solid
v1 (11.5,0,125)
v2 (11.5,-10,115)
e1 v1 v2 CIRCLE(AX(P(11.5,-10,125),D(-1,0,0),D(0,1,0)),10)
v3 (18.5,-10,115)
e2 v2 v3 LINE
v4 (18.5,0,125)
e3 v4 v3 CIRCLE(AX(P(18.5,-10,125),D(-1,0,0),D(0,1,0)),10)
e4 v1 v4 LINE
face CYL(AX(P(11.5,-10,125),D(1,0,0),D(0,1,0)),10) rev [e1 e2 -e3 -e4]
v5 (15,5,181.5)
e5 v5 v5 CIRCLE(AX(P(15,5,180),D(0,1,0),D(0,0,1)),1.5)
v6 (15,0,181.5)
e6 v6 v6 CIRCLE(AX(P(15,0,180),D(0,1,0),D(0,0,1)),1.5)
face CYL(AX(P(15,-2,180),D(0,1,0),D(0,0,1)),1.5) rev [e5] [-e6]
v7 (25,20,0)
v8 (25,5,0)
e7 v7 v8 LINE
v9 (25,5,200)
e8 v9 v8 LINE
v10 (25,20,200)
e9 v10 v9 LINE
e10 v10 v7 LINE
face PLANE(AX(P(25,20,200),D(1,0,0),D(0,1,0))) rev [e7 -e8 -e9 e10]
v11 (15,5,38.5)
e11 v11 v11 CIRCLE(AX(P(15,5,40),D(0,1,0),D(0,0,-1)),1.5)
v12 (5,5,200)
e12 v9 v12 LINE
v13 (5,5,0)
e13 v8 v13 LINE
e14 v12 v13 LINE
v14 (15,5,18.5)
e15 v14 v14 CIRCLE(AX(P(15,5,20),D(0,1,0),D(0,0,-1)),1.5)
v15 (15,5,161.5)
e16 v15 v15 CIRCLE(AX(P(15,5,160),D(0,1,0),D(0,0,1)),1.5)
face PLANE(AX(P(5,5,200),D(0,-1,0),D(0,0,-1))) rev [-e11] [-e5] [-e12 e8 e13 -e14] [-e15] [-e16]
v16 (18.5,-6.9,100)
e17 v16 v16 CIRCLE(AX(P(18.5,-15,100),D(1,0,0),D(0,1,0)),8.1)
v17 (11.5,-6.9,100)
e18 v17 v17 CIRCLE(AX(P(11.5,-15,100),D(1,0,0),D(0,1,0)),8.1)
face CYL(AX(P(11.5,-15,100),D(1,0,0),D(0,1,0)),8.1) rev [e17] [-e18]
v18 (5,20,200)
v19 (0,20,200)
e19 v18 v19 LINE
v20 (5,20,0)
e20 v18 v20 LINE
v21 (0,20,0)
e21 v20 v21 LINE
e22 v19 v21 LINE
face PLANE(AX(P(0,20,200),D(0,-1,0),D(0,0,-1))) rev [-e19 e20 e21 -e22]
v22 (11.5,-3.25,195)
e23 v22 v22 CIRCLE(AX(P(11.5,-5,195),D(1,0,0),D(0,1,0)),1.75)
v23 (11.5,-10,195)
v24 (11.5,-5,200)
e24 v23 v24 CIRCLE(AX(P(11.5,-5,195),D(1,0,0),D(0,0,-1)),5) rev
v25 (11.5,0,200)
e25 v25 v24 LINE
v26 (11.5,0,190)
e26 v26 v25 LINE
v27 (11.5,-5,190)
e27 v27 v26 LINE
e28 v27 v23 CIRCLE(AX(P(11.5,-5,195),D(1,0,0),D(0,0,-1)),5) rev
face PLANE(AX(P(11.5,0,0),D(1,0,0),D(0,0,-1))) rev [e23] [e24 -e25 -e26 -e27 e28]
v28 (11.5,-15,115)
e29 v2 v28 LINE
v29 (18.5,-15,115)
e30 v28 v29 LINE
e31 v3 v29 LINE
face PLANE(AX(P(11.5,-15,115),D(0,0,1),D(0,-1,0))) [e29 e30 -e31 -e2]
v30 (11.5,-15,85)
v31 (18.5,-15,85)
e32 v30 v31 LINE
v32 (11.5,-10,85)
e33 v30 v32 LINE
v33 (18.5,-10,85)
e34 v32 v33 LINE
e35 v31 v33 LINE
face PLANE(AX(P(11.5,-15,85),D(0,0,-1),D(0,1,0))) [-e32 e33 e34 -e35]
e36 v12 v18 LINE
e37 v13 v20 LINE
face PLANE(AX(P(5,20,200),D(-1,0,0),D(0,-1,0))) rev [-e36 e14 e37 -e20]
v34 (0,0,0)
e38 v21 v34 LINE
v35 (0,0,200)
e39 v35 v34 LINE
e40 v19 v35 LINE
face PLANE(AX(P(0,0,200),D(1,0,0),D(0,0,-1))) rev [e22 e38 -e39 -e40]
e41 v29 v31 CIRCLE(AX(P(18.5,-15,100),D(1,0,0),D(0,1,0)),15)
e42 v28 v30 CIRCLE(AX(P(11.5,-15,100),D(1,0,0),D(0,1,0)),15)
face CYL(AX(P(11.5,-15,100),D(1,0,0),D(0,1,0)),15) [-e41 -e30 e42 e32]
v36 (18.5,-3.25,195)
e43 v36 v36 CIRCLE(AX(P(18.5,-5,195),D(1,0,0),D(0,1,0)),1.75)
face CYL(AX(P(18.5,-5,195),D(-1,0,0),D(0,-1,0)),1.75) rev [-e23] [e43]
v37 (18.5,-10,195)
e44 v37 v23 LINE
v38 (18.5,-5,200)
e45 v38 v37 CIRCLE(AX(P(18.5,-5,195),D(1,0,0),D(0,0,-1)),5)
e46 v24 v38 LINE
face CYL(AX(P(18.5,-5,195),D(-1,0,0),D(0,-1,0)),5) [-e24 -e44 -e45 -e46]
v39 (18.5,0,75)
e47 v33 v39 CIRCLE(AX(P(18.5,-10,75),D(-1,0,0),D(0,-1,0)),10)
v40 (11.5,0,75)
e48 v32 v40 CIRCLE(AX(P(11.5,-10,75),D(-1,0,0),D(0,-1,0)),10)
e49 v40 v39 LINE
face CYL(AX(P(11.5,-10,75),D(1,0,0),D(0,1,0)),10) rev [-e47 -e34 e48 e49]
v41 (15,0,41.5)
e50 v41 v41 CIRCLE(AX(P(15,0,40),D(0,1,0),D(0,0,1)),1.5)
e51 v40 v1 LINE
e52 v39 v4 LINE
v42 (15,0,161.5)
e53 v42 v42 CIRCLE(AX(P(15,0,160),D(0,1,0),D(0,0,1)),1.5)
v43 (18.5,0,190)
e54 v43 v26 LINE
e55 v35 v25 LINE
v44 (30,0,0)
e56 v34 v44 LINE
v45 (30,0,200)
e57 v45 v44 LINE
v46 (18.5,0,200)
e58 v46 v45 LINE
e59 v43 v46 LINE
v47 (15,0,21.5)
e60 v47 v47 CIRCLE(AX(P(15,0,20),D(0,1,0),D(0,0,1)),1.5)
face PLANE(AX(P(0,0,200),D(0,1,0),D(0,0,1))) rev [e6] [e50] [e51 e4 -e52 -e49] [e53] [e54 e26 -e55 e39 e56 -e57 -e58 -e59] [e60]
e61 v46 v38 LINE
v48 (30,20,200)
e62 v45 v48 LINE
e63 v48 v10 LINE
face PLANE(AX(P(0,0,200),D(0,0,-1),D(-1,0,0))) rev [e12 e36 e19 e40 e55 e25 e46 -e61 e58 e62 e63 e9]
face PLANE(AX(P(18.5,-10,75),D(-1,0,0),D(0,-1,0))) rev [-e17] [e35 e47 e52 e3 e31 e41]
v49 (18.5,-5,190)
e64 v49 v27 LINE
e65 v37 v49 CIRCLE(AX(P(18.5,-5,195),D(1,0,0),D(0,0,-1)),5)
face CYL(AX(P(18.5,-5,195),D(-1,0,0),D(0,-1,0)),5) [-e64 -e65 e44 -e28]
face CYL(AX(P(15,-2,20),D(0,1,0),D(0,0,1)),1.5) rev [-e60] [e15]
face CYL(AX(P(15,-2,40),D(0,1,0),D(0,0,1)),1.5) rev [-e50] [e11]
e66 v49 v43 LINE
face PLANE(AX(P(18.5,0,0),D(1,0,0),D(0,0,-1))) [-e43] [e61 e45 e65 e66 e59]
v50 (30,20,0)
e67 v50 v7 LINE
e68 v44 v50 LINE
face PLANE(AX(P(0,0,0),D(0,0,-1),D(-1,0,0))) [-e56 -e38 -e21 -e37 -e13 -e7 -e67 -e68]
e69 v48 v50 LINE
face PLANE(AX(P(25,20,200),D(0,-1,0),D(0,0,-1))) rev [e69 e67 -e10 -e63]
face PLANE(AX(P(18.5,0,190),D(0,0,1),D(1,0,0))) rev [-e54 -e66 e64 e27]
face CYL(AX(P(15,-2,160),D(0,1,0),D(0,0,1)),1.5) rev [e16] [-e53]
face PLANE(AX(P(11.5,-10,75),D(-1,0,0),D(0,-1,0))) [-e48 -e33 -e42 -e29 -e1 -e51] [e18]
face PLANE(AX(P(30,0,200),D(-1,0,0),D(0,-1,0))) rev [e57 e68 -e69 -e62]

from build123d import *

# Parameters (mm, degrees)
BOSS_EXTRUDE1_DEPTH = 200
BOSS_EXTRUDE2_START = -11.5
SKETCH2_R           = 8.1
BOSS_EXTRUDE2_DEPTH = 7
BOSS_EXTRUDE3_START = -18.5
SKETCH3_W           = 10
SKETCH3_H           = 10
SKETCH3_R           = 1.75
BOSS_EXTRUDE3_DEPTH = 7
FILLET1_R           = 5
SKETCH5_R           = 1.5
CUT_EXTRUDE1_DEPTH  = 7


with BuildPart() as part:
    # Sketch1 → Boss-Extrude1 (new body)
    with BuildSketch(Plane.XY):
        Polygon((25, 20), (30, 20), (30, 0), (0, 0), (0, 20), (5, 20), (5, 5), (25, 5), align=None)
    extrude(amount=BOSS_EXTRUDE1_DEPTH)

    # Sketch2 → Boss-Extrude2 (add)
    with BuildSketch(Plane(origin=(30, 0, 0), x_dir=(0, 0, -1), z_dir=(1, 0, 0)).offset(BOSS_EXTRUDE2_START)):
        with BuildLine():
            Line((-115, -15), (-115, -10))
            ThreePointArc((-115, -10), (-117.928932188, -2.928932188), (-125, 0))
            Line((-125, 0), (-75, 0))
            ThreePointArc((-75, 0), (-82.071067812, -2.928932188), (-85, -10))
            Line((-85, -10), (-85, -15))
            ThreePointArc((-85, -15), (-100, -30), (-115, -15))
        make_face()
        with Locations(Location((-100, -15, 0), (0, 0, 90))):
            Circle(SKETCH2_R, mode=Mode.SUBTRACT)
    extrude(amount=-BOSS_EXTRUDE2_DEPTH)

    # Sketch3 → Boss-Extrude3 (add)
    with BuildSketch(Plane(origin=(30, 0, 0), x_dir=(0, 0, -1), z_dir=(1, 0, 0)).offset(BOSS_EXTRUDE3_START)):
        with Locations((-195, -5)):
            Rectangle(SKETCH3_W, SKETCH3_H)
        with Locations(Location((-195, -5, 0), (0, 0, 90))):
            Circle(SKETCH3_R, mode=Mode.SUBTRACT)
    extrude(amount=BOSS_EXTRUDE3_DEPTH)

    # Fillet1
    fillet1_edges = [part.edges().sort_by_distance(p)[0] for p in [
        (15, -10, 190),
        (15, -10, 200),
    ]]
    fillet(fillet1_edges, radius=FILLET1_R - 0.0001)  # a hair under: the kernel refuses the full size

    # Sketch5 → Cut-Extrude1 (cut)
    with BuildSketch(Plane(origin=(0, 5, 0), x_dir=(1, 0, 0), z_dir=(0, 1, 0))):
        with Locations(Location((15, -180, 0), (0, 0, 270))):
            Circle(SKETCH5_R)
        with Locations(Location((15, -160, 0), (0, 0, 270))):
            Circle(SKETCH5_R)
        with Locations(Location((15, -40, 0), (0, 0, 270))):
            Circle(SKETCH5_R)
        with Locations(Location((15, -20, 0), (0, 0, 270))):
            Circle(SKETCH5_R)
    extrude(amount=-CUT_EXTRUDE1_DEPTH, mode=Mode.SUBTRACT)


solid = part.part
